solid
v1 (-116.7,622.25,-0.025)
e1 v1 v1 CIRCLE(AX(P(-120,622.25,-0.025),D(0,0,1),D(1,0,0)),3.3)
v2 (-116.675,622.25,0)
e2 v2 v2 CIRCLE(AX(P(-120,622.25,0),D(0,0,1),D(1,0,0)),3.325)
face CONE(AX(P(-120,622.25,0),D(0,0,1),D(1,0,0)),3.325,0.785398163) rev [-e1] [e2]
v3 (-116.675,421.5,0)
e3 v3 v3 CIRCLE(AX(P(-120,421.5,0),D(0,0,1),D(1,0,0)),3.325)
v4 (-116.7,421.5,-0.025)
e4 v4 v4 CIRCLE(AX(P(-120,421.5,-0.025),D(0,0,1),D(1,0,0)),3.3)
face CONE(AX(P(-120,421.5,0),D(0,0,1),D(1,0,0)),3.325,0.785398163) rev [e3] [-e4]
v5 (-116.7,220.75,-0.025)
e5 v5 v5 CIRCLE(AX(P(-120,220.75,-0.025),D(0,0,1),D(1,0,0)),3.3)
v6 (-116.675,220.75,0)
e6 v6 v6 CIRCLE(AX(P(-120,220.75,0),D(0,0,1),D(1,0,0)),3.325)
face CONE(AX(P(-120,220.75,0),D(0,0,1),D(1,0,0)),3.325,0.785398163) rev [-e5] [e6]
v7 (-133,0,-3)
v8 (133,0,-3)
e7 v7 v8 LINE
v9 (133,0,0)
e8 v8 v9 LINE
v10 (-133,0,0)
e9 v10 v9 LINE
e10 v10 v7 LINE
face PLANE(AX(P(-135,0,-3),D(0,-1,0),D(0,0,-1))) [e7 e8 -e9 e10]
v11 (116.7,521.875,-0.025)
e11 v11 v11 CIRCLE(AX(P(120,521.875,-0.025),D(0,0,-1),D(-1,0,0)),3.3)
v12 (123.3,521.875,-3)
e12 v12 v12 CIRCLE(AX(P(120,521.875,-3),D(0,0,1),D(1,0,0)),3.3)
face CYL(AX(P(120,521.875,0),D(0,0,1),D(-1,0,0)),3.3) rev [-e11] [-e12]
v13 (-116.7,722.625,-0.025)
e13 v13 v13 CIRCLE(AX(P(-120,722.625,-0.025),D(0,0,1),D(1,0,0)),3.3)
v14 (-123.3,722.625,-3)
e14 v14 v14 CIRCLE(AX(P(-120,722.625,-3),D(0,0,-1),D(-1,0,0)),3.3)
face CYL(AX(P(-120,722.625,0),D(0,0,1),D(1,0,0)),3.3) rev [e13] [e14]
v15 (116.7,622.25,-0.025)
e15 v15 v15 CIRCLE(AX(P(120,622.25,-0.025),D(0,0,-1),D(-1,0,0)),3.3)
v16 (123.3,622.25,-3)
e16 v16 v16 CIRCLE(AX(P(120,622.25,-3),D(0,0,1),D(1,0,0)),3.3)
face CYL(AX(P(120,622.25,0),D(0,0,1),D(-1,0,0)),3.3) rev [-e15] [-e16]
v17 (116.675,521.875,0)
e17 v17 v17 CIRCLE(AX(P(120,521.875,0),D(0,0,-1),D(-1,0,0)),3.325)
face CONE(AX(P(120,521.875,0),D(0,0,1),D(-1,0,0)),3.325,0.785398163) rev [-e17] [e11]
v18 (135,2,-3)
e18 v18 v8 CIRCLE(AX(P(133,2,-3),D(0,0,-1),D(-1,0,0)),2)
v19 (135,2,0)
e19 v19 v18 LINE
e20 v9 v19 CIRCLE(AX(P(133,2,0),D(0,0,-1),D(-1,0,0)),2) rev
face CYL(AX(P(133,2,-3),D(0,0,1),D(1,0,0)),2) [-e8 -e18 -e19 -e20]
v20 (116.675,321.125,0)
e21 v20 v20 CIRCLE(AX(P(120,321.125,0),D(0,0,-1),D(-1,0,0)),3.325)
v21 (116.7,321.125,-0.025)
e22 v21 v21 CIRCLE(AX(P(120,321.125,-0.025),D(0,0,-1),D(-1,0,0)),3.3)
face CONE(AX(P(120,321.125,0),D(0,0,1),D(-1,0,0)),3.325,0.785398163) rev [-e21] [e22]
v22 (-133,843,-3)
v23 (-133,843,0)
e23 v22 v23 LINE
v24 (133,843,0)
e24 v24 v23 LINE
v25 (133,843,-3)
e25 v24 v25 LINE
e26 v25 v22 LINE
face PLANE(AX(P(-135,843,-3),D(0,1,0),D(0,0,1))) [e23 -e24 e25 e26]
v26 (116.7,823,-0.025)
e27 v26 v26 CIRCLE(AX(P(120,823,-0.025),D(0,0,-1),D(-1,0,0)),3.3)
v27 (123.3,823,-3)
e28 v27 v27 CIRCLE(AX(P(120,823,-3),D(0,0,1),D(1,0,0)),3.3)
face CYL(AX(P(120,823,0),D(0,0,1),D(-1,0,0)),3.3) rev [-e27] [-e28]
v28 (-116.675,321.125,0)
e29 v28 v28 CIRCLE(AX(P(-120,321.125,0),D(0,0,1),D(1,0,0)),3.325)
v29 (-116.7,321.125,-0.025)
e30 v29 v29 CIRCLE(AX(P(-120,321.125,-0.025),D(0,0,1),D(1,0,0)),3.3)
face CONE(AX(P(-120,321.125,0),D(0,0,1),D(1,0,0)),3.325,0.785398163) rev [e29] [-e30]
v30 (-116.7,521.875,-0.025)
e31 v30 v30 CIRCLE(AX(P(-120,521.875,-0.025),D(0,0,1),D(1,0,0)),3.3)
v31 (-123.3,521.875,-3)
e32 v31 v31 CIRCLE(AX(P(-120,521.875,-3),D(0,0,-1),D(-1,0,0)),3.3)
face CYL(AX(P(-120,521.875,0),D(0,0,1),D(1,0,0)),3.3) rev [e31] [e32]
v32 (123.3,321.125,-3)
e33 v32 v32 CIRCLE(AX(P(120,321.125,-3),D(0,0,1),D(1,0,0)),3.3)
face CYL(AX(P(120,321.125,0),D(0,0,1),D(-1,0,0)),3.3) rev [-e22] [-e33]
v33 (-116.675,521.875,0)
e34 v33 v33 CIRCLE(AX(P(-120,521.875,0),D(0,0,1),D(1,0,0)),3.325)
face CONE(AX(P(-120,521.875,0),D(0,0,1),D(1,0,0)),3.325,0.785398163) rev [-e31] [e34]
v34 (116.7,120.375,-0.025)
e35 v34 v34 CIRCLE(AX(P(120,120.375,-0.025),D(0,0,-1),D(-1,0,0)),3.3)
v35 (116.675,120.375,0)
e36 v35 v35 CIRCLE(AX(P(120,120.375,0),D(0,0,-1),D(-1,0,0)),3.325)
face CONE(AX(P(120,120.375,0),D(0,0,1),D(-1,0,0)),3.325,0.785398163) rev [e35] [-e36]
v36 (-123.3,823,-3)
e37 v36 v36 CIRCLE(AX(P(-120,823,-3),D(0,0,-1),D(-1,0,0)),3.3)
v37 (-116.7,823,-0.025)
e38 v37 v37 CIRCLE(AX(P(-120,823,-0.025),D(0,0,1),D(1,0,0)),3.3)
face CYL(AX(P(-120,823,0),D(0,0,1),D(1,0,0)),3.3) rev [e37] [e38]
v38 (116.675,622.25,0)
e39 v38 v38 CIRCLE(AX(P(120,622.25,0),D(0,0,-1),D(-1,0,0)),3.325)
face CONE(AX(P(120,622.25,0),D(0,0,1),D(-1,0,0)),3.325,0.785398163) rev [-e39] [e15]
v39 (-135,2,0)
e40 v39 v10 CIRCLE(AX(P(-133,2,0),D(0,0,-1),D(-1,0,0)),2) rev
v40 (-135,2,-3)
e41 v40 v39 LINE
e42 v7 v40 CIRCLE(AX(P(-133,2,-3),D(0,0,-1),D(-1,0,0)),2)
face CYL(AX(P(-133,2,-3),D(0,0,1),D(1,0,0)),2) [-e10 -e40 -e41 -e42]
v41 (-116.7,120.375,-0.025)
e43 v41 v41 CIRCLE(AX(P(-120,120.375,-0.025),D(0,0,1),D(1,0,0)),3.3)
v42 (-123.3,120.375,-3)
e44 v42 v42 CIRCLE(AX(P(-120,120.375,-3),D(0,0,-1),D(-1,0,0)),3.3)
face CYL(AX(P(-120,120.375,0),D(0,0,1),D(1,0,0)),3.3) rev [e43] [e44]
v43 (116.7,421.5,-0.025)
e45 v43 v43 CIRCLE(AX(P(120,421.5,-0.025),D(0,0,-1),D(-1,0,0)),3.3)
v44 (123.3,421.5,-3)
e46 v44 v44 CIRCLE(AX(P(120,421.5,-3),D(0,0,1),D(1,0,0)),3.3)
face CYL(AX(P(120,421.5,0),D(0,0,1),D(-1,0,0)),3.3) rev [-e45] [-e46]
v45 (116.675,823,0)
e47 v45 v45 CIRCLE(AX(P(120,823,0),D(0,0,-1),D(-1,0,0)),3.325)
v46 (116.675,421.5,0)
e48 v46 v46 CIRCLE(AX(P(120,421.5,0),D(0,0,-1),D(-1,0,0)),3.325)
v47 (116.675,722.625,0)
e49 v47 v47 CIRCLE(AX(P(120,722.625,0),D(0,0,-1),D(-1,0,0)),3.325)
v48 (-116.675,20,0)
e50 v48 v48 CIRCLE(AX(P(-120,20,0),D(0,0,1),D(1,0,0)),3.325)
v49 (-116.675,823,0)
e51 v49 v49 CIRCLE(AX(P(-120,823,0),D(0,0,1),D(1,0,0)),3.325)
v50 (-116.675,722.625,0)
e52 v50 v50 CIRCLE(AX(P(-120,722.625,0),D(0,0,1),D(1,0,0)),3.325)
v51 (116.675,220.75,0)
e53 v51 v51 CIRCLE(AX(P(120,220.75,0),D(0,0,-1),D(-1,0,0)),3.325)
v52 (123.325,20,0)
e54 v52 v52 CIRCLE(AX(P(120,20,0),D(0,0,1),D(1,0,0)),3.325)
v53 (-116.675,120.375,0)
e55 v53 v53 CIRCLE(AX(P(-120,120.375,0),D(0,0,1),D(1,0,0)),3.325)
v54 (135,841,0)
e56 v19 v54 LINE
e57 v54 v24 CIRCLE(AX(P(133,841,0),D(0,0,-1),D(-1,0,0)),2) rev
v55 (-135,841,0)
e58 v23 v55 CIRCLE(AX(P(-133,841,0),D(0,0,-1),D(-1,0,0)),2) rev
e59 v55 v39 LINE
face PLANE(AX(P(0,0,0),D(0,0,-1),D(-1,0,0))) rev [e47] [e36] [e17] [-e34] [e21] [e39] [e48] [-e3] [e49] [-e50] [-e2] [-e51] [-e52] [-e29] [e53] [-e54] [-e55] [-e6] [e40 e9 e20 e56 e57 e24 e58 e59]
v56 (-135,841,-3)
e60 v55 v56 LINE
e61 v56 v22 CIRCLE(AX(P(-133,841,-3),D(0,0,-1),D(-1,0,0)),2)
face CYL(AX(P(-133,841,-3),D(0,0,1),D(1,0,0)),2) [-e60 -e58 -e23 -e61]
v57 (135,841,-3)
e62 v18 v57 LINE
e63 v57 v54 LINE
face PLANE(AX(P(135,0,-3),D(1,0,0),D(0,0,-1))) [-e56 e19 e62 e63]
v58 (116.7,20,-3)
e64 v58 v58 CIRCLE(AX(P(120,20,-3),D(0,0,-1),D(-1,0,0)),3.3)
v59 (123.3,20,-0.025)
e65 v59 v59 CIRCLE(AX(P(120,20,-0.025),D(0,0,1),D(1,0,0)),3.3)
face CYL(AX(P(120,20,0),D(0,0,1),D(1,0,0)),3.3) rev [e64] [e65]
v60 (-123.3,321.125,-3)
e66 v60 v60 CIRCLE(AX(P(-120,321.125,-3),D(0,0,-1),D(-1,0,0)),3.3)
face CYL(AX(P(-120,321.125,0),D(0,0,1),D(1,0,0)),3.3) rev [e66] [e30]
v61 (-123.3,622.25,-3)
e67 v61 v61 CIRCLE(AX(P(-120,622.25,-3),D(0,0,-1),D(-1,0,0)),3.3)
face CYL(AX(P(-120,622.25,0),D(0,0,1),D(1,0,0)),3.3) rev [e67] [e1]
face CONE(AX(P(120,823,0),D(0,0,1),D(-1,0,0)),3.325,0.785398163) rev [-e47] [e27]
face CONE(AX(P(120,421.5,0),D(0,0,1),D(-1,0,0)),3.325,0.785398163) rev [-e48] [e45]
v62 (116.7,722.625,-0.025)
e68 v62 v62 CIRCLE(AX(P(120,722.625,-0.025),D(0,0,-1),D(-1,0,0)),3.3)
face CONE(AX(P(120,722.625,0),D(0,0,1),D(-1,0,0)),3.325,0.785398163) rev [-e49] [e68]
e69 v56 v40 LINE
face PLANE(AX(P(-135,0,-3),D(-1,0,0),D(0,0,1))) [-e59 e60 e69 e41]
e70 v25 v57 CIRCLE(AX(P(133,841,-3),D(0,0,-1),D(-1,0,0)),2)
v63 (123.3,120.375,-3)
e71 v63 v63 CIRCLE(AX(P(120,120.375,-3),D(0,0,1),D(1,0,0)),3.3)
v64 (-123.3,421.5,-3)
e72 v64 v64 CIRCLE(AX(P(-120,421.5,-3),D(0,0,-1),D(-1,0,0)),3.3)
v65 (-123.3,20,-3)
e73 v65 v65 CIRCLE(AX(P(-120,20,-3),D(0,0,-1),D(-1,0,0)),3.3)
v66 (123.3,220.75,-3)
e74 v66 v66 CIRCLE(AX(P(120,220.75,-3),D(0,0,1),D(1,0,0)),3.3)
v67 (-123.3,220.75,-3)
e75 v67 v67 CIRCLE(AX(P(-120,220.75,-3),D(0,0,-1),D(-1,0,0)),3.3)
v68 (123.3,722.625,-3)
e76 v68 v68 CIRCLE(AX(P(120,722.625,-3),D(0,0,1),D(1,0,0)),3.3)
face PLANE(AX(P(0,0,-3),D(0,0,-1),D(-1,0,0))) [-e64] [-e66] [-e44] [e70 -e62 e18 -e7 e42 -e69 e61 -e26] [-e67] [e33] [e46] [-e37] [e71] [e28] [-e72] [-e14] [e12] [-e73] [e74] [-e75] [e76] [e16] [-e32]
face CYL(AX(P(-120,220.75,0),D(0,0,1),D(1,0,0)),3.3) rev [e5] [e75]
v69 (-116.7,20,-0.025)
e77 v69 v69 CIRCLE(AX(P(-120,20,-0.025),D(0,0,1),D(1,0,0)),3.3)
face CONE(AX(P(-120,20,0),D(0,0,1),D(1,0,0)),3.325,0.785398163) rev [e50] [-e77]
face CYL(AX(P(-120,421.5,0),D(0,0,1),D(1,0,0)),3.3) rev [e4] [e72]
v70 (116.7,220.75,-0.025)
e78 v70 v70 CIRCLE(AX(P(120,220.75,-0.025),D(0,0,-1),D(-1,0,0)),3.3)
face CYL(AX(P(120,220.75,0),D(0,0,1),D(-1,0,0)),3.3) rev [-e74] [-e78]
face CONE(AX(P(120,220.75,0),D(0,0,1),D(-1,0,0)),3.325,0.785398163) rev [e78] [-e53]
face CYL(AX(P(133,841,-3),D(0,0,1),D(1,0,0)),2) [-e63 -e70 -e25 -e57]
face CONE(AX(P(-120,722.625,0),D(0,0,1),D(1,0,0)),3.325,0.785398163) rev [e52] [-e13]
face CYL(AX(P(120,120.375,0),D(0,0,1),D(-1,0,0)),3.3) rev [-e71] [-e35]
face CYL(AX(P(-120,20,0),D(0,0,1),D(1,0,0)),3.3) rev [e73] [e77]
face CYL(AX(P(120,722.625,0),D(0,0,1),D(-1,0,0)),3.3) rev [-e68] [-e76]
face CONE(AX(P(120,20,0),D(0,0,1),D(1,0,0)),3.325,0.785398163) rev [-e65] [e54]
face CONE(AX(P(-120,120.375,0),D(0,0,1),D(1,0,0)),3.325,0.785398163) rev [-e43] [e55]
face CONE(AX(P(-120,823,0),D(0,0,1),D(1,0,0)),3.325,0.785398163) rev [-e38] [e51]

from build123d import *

# Parameters (mm, degrees)
SKETCH1_W          = 270
SKETCH1_H          = 843
BASE_FLANGE1_DEPTH = 3
CRVPATTERN2_COUNT  = 9
CRVPATTERN2_PITCH  = 100.375
FILLET1_R          = 2


# Sheet-metal steps are written as plain solids
with BuildPart() as part:
    # Sketch1 → Base-Flange1 (new body)
    with BuildSketch(Plane.XY):
        with Locations((0, 421.5)):
            Rectangle(SKETCH1_W, SKETCH1_H)
    extrude(amount=-BASE_FLANGE1_DEPTH)

    # Sketch8 → M6 Clearance Hole1 (revolve, cut)
    with BuildSketch(Plane(origin=(-120, 20, 0), x_dir=(0, -1, 0), z_dir=(1, 0, 0))):
        Polygon((0, 0), (0, 3), (3.3, 3), (3.3, 0.025), (3.325, 0), align=None)
    m6_clearance_hole1 = revolve(axis=Axis((-120, 20, 6.35), (0, 0, -1)), mode=Mode.SUBTRACT)

    # CrvPattern2: M6 Clearance Hole1 ×9
    with Locations(*[(0, i * CRVPATTERN2_PITCH, 0) for i in range(1, CRVPATTERN2_COUNT)]):
        add(m6_clearance_hole1, mode=Mode.SUBTRACT)

    # Mirror1: M6 Clearance Hole1 across plane
    add(m6_clearance_hole1.mirror(Plane(origin=(0, 0, 0), x_dir=(0, 0, 1), z_dir=(1, 0, 0))), mode=Mode.SUBTRACT)

    # Mirror1 copy 1 sketch → Mirror1 copy 1 (revolve, cut)
    with BuildSketch(Plane(origin=(120, 120.375, 0), x_dir=(0, -1, 0), z_dir=(-1, 0, 0))):
        Polygon((0, 0), (0, -3), (3.3, -3), (3.3, -0.025), (3.325, 0), align=None)
    revolve(axis=Axis((120, 120.375, 6.35), (0, 0, 1)), mode=Mode.SUBTRACT)

    # Mirror1 copy 2 sketch → Mirror1 copy 2 (revolve, cut)
    with BuildSketch(Plane(origin=(120, 220.75, 0), x_dir=(0, -1, 0), z_dir=(-1, 0, 0))):
        Polygon((0, 0), (0, -3), (3.3, -3), (3.3, -0.025), (3.325, 0), align=None)
    revolve(axis=Axis((120, 220.75, 6.35), (0, 0, 1)), mode=Mode.SUBTRACT)

    # Mirror1 copy 3 sketch → Mirror1 copy 3 (revolve, cut)
    with BuildSketch(Plane(origin=(120, 321.125, 0), x_dir=(0, -1, 0), z_dir=(-1, 0, 0))):
        Polygon((0, 0), (0, -3), (3.3, -3), (3.3, -0.025), (3.325, 0), align=None)
    revolve(axis=Axis((120, 321.125, 6.35), (0, 0, 1)), mode=Mode.SUBTRACT)

    # Mirror1 copy 4 sketch → Mirror1 copy 4 (revolve, cut)
    with BuildSketch(Plane(origin=(120, 421.5, 0), x_dir=(0, -1, 0), z_dir=(-1, 0, 0))):
        Polygon((0, 0), (0, -3), (3.3, -3), (3.3, -0.025), (3.325, 0), align=None)
    revolve(axis=Axis((120, 421.5, 6.35), (0, 0, 1)), mode=Mode.SUBTRACT)

    # Mirror1 copy 5 sketch → Mirror1 copy 5 (revolve, cut)
    with BuildSketch(Plane(origin=(120, 521.875, 0), x_dir=(0, -1, 0), z_dir=(-1, 0, 0))):
        Polygon((0, 0), (0, -3), (3.3, -3), (3.3, -0.025), (3.325, 0), align=None)
    revolve(axis=Axis((120, 521.875, 6.35), (0, 0, 1)), mode=Mode.SUBTRACT)

    # Mirror1 copy 6 sketch → Mirror1 copy 6 (revolve, cut)
    with BuildSketch(Plane(origin=(120, 622.25, 0), x_dir=(0, -1, 0), z_dir=(-1, 0, 0))):
        Polygon((0, 0), (0, -3), (3.3, -3), (3.3, -0.025), (3.325, 0), align=None)
    revolve(axis=Axis((120, 622.25, 6.35), (0, 0, 1)), mode=Mode.SUBTRACT)

    # Mirror1 copy 7 sketch → Mirror1 copy 7 (revolve, cut)
    with BuildSketch(Plane(origin=(120, 722.625, 0), x_dir=(0, -1, 0), z_dir=(-1, 0, 0))):
        Polygon((0, 0), (0, -3), (3.3, -3), (3.3, -0.025), (3.325, 0), align=None)
    revolve(axis=Axis((120, 722.625, 6.35), (0, 0, 1)), mode=Mode.SUBTRACT)

    # Mirror1 copy 8 sketch → Mirror1 copy 8 (revolve, cut)
    with BuildSketch(Plane(origin=(120, 823, 0), x_dir=(0, -1, 0), z_dir=(-1, 0, 0))):
        Polygon((0, 0), (0, -3), (3.3, -3), (3.3, -0.025), (3.325, 0), align=None)
    revolve(axis=Axis((120, 823, 6.35), (0, 0, 1)), mode=Mode.SUBTRACT)

    # Fillet1
    fillet1_edges = [part.edges().sort_by_distance(p)[0] for p in [
        (-135, 843, -1.5),
        (135, 843, -1.5),
        (135, 0, -1.5),
        (-135, 0, -1.5),
    ]]
    fillet(fillet1_edges, radius=FILLET1_R)


solid = part.part
